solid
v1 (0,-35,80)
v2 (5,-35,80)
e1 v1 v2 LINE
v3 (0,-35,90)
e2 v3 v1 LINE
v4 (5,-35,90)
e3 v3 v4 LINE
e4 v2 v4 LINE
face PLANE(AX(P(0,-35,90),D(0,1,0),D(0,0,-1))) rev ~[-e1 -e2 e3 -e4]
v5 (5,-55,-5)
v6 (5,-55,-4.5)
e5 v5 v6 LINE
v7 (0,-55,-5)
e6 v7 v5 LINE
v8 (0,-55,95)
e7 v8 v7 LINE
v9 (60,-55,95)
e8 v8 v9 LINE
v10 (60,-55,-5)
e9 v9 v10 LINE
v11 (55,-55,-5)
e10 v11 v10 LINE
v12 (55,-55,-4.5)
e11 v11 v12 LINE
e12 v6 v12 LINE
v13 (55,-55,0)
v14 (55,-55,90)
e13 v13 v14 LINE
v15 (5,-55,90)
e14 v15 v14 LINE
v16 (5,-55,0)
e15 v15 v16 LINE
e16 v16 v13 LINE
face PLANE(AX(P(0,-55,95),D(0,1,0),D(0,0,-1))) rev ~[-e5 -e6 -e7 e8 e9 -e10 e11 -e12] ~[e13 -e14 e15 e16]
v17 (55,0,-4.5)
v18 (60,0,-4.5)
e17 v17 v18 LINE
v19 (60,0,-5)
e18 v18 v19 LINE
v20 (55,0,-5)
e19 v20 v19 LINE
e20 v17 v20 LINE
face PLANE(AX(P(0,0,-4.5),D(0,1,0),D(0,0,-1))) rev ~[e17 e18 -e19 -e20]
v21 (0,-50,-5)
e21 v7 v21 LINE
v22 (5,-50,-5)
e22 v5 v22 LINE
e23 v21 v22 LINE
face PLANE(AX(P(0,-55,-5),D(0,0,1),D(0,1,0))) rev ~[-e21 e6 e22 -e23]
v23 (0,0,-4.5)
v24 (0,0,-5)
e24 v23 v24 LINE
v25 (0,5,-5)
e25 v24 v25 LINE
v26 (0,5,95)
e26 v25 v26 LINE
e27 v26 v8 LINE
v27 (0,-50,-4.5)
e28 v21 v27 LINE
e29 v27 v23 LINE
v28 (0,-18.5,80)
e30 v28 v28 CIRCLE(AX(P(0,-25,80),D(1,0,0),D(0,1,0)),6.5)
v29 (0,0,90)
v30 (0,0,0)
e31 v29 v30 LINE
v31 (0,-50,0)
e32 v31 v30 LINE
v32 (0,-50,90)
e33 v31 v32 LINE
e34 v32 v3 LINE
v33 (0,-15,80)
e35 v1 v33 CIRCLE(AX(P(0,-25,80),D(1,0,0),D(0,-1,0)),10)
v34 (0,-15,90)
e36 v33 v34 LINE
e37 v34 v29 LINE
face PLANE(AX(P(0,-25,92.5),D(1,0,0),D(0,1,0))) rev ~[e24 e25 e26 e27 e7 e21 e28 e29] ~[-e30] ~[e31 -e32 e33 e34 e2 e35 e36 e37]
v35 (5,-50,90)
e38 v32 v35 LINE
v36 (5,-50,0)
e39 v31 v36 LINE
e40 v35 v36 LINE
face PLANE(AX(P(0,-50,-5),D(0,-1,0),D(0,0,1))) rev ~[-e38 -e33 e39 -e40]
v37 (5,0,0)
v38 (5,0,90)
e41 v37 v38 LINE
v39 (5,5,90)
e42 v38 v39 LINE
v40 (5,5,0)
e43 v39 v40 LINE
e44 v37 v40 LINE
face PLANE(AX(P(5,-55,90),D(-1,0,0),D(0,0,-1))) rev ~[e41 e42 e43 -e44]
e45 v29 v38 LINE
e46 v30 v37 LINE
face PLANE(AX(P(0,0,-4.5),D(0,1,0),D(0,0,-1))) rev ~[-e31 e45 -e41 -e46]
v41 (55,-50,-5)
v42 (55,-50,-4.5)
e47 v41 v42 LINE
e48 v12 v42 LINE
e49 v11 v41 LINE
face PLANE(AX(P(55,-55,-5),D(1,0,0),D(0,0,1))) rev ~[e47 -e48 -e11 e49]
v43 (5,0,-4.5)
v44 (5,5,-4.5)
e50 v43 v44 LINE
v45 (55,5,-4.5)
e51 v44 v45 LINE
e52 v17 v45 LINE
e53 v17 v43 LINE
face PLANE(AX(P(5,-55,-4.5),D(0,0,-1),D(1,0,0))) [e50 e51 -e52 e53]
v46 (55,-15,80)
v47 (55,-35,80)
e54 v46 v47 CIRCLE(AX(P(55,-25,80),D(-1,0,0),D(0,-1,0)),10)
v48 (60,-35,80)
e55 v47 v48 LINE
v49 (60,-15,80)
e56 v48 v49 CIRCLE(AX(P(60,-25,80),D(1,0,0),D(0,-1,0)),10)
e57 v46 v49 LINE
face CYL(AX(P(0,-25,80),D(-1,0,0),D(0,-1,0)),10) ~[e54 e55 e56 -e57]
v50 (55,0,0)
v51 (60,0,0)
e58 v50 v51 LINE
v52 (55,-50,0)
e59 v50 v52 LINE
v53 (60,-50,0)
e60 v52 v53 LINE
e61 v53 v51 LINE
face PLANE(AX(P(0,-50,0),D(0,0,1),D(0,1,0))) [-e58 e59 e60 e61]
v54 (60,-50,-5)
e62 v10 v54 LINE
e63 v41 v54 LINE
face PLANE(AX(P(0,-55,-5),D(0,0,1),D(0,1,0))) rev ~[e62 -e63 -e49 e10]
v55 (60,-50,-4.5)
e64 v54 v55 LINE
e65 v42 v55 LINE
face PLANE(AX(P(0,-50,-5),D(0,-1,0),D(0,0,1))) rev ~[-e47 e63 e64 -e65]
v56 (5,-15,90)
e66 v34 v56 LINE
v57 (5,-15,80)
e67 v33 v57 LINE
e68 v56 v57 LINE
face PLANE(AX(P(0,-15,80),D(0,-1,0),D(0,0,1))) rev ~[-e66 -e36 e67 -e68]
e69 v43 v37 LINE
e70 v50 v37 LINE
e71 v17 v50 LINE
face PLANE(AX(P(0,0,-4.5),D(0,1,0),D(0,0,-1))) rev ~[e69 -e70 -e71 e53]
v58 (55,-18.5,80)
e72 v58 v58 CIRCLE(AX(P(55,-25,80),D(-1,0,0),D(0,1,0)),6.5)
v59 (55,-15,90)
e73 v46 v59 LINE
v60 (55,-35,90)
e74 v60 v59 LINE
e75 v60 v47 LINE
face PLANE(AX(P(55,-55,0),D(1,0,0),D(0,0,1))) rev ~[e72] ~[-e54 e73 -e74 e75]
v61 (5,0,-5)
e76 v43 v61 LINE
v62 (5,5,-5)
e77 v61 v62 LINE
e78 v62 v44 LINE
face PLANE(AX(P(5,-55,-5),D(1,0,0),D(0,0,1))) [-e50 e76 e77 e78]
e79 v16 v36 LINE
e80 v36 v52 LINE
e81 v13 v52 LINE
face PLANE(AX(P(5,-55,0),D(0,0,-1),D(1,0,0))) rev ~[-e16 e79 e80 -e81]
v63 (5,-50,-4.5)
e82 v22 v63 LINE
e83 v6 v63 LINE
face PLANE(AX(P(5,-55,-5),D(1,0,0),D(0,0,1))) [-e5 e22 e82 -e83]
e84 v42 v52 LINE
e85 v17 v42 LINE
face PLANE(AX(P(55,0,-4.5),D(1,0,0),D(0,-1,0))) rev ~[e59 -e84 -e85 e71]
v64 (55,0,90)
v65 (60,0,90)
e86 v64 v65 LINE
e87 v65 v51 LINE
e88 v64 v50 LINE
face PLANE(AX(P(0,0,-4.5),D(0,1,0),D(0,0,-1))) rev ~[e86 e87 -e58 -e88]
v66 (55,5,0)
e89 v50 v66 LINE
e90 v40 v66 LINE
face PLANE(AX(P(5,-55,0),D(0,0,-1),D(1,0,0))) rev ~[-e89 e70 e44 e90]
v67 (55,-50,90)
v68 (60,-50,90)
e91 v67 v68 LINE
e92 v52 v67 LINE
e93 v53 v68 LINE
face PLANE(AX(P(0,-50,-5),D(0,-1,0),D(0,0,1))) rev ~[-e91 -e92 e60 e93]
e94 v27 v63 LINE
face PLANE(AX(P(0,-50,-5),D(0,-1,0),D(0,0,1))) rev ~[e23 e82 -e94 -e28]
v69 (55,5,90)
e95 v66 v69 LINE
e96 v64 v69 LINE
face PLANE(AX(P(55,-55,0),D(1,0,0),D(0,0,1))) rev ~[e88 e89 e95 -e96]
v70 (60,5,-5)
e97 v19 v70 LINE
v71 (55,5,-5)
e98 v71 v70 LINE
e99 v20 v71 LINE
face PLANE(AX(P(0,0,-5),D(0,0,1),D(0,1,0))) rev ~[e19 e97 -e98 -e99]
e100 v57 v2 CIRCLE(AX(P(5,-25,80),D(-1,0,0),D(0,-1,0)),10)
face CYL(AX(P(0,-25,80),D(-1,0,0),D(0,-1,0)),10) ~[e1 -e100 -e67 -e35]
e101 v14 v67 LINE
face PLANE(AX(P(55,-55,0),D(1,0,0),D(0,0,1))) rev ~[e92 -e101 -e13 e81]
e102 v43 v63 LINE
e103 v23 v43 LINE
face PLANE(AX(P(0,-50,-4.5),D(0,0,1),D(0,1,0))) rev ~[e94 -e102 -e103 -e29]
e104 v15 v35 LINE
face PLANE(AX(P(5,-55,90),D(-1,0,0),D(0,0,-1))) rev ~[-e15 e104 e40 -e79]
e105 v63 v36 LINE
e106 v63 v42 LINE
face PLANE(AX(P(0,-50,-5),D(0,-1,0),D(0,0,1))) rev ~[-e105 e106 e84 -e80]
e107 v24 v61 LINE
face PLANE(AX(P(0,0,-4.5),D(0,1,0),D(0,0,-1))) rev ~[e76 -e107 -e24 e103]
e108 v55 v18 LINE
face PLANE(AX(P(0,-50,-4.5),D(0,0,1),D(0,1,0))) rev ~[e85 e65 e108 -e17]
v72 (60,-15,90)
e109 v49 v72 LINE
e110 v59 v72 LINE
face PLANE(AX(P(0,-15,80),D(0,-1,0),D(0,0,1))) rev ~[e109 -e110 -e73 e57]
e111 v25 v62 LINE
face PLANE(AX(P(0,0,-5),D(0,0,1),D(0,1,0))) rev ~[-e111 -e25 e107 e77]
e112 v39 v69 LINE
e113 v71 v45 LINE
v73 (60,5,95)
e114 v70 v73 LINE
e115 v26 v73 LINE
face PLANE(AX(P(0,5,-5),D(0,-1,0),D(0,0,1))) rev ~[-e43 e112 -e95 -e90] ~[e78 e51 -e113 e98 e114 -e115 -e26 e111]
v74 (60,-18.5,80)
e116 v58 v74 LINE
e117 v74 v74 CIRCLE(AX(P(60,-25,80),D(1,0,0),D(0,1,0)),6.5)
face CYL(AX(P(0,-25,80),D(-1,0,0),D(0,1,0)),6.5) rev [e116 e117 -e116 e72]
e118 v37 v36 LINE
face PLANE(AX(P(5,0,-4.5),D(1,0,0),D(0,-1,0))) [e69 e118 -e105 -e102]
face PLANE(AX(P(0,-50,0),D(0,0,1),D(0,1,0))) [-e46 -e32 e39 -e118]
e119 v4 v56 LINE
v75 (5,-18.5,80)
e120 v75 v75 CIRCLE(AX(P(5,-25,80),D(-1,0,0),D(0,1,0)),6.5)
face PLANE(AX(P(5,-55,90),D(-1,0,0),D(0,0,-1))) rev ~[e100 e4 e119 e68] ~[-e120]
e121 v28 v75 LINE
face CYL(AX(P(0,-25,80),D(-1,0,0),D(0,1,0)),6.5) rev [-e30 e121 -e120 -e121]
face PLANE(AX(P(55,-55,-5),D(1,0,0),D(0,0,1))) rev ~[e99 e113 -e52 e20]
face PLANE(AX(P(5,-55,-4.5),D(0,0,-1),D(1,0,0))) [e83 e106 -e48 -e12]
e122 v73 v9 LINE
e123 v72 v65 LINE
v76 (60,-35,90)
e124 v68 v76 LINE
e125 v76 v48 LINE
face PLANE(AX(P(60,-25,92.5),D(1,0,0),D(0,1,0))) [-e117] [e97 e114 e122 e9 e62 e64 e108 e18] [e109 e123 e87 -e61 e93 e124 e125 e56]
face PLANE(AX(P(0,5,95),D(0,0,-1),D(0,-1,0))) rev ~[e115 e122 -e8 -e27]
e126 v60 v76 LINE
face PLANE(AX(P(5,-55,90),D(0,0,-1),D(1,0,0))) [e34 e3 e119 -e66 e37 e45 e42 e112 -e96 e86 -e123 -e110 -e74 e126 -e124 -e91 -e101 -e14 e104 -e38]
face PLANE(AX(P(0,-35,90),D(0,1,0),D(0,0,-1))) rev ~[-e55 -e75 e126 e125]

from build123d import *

# Parameters (mm, degrees)
F0_W     = 50
F0_H     = 4.5
F0_R     = 6.5
F1_DEPTH = 60
F4_W     = 50
F4_H     = 50
F5_DEPTH = 4.5
F6_W     = 50
F6_H     = 65
F6_H_2   = 25
F6_H_3   = 0.5
F7_DEPTH = 60


with BuildPart() as f1:
    # F0 (on Right) → F1 (new body)
    with BuildSketch(Plane.YZ):
        Polygon((-55, 95), (-55, 90), (-50, 90), (-35, 90), (-25, 90), (-15, 90), (0, 90), (5, 90), (5, 95), align=None)
        Polygon((-50, 90), (-55, 90), (-55, -5), (-50, -5), (-50, -4.5), (-50, 0), align=None)
        with Locations((-25, -2.25)):
            Rectangle(F0_W, F0_H)
        Polygon((0, 90), (0, 0), (0, -4.5), (0, -5), (5, -5), (5, 90), align=None)
        with BuildLine():
            ThreePointArc((-15, 80), (-17.9289321881, 87.0710678119), (-25, 90))
            ThreePointArc((-25, 90), (-32.0710678119, 87.0710678119), (-35, 80))
            ThreePointArc((-35, 80), (-25, 70), (-15, 80))
        make_face()
        with Locations((-25, 80)):
            Circle(F0_R, mode=Mode.SUBTRACT)
        with BuildLine():
            Line((-25, 90), (-35, 90))
            Line((-35, 90), (-35, 80))
            ThreePointArc((-35, 80), (-32.0710678119, 87.0710678119), (-25, 90))
        make_face()
        with BuildLine():
            Line((-15, 90), (-25, 90))
            ThreePointArc((-25, 90), (-17.9289321881, 87.0710678119), (-15, 80))
            Line((-15, 80), (-15, 90))
        make_face()
    extrude(amount=F1_DEPTH)

    # F4 (on face) → F5 (cut)
    with BuildSketch(Plane(origin=(0, 0, -4.5), x_dir=(1, 0, 0), z_dir=(0, 0, -1))):
        with Locations((30, 25)):
            Rectangle(F4_W, F4_H)
    extrude(amount=-F5_DEPTH, mode=Mode.SUBTRACT)

    # F6 (on offset) → F7 (cut)
    with BuildSketch(Plane.XZ.offset(55)):
        with Locations((30, 57.5)):
            Rectangle(F6_W, F6_H)
        with Locations((30, 12.5)):
            Rectangle(F6_W, F6_H_2)
        with Locations((30, -4.75)):
            Rectangle(F6_W, F6_H_3)
    extrude(amount=-F7_DEPTH, mode=Mode.SUBTRACT)


solid = f1.part
